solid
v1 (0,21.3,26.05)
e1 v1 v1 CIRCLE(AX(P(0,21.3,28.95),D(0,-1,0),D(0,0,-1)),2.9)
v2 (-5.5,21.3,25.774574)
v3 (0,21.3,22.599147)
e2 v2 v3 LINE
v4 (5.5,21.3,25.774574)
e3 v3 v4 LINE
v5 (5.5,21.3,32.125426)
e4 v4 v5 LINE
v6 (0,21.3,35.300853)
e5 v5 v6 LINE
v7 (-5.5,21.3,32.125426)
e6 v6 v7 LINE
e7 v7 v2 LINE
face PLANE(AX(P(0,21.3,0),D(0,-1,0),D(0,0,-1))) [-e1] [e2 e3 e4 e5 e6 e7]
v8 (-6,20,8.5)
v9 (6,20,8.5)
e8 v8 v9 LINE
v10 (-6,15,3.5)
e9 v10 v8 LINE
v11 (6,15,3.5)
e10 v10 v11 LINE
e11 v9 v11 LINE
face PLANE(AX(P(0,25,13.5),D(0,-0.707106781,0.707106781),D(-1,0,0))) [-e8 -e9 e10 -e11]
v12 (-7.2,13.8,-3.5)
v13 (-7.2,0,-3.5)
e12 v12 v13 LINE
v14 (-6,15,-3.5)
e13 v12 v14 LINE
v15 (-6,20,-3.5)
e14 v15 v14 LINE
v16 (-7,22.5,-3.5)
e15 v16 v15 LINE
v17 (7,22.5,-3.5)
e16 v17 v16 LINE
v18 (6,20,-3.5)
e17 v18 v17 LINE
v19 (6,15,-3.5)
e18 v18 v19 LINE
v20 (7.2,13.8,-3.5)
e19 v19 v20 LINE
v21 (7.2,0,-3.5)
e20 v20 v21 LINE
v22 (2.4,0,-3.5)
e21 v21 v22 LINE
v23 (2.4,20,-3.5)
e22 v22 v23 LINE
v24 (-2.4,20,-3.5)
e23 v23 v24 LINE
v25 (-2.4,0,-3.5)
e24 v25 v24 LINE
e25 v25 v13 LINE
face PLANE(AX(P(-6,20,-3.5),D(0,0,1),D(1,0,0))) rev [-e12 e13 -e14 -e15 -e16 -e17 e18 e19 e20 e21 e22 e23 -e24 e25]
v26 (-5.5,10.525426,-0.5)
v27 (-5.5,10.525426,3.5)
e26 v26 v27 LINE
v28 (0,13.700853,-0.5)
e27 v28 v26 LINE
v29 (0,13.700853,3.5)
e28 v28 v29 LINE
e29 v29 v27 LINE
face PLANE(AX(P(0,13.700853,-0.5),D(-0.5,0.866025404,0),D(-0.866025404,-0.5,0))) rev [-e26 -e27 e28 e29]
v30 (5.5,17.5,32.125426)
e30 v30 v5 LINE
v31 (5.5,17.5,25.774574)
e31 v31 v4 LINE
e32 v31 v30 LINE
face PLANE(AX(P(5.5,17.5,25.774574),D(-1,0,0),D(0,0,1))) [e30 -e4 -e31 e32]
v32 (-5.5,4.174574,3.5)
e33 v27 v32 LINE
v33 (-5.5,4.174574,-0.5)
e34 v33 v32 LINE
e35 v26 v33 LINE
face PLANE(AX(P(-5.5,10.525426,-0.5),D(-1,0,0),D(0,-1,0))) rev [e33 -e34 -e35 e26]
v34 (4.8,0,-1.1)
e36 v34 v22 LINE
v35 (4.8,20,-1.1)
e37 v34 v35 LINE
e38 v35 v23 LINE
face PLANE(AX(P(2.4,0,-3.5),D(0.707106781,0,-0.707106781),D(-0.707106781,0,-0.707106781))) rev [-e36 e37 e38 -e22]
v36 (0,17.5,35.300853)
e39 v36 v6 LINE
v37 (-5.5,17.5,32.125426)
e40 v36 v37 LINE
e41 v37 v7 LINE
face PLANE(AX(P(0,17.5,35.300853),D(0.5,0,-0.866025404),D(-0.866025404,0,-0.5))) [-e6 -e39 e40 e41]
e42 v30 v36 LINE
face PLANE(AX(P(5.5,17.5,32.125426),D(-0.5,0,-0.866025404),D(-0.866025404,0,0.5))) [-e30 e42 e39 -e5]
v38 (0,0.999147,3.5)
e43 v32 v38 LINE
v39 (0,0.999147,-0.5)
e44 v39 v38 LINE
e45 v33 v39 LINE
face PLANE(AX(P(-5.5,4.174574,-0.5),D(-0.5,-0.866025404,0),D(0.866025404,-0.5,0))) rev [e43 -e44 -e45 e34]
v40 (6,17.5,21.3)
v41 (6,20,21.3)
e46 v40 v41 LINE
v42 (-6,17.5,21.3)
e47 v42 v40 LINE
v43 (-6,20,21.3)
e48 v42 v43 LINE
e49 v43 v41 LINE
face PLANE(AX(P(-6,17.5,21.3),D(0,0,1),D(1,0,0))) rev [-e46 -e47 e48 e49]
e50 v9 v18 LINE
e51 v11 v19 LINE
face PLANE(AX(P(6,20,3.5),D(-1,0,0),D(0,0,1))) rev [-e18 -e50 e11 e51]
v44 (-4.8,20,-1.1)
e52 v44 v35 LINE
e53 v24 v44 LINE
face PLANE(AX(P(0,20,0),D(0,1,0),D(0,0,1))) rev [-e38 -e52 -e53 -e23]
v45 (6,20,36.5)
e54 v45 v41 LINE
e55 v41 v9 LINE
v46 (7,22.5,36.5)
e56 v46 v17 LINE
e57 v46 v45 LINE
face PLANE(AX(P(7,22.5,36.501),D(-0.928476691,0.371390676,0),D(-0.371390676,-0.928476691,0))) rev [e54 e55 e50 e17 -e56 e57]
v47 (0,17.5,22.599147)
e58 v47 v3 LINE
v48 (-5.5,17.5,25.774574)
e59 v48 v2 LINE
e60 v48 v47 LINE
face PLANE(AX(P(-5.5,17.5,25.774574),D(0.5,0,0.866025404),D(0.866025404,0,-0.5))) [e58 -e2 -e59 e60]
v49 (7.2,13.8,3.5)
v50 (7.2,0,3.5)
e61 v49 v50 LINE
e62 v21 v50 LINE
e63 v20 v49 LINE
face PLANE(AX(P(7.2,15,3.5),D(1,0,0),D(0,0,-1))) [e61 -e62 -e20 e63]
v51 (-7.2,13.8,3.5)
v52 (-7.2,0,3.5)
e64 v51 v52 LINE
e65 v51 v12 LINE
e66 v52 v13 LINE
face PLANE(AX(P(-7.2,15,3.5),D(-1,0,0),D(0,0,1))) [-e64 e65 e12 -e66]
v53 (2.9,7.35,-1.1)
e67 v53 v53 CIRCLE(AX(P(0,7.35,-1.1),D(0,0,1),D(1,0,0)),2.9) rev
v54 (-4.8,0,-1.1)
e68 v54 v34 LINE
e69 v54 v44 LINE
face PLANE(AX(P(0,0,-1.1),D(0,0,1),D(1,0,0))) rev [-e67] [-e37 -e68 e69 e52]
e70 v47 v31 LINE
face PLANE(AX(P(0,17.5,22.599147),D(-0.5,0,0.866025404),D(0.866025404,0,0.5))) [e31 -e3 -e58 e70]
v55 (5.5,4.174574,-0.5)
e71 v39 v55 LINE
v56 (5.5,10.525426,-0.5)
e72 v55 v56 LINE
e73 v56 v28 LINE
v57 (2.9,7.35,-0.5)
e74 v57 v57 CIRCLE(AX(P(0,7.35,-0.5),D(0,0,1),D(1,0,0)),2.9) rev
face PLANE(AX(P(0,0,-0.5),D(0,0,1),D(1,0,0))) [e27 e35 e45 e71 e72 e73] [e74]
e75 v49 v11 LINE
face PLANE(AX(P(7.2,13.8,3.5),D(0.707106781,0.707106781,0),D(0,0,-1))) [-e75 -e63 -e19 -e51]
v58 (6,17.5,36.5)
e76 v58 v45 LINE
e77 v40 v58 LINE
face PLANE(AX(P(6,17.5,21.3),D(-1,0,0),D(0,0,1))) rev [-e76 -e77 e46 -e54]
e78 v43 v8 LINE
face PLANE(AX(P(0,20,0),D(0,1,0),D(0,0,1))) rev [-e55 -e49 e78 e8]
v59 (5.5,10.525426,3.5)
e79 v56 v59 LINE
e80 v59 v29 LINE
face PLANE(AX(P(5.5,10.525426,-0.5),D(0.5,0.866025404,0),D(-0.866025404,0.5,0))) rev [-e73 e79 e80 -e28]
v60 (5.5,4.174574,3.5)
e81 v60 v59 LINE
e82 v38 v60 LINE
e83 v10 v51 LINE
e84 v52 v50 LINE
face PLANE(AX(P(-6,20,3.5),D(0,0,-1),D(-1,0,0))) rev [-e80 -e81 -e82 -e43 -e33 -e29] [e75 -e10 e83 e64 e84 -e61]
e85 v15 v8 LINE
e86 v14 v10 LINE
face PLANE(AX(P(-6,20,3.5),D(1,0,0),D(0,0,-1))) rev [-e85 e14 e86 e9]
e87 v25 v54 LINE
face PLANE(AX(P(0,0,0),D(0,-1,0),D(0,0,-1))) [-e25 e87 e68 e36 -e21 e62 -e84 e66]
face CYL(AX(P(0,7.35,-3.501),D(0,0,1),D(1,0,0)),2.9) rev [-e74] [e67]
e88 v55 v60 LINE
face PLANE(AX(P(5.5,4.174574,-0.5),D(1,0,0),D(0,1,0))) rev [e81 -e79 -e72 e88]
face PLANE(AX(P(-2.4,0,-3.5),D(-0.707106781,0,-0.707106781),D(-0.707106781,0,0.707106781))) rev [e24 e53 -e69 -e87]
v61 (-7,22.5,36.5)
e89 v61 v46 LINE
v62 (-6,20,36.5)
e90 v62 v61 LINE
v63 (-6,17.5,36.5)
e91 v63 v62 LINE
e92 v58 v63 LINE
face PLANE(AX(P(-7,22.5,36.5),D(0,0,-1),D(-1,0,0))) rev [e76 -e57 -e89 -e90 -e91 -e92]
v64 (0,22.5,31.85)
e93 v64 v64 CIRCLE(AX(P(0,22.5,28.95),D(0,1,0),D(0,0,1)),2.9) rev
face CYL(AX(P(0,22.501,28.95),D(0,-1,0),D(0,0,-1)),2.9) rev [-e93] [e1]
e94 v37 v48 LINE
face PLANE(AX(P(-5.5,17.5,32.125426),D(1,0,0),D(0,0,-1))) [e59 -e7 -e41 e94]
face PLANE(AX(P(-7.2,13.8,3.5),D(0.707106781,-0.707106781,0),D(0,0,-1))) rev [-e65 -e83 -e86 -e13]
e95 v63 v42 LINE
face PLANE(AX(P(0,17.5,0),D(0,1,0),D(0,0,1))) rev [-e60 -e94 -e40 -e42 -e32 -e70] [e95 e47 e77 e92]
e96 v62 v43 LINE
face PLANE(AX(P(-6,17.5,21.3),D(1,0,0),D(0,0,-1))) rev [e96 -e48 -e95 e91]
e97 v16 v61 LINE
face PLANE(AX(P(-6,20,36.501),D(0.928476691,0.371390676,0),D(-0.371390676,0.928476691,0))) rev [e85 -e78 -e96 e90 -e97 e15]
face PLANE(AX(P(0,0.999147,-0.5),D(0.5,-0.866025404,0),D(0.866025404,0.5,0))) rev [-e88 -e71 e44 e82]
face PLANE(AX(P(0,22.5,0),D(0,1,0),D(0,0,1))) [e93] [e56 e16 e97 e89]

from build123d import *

# Parameters (mm, degrees)
SKETCH1_W               = 12
SKETCH1_H               = 7
BOSS_EXTRUDE1_DEPTH     = 20
CUT_EXTRUDE1_DEPTH      = 20
CUT_EXTRUDE2_REACH      = 24.023
SKETCH3_R               = 2.9
CUT_EXTRUDE3_DEPTH      = 4
SKETCH5_W               = 14
SKETCH5_H               = 40
BOSS_EXTRUDE2_DEPTH     = 2.5
CUT_EXTRUDE4_REACH      = 48.425
SKETCH14_W              = 12
SKETCH14_H              = 15.2
BOSS_EXTRUDE6_DEPTH     = 2.5
CUT_EXTRUDE6_DEPTH      = 2.5
CUT_EXTRUDE6_DEPTH_BACK = 1.3
CUT_EXTRUDE7_REACH      = 44.836
SKETCH9_R               = 2.9
SKETCH10_W              = 1.2
SKETCH10_H              = 7
BOSS_EXTRUDE3_DEPTH     = 15
CHAMFER1_SIZE           = 1.2
SKETCH12_W              = 12
SKETCH12_H              = 5
BOSS_EXTRUDE5_DEPTH     = 10
CHAMFER3_SIZE           = 10


# Some blends are built 0.0001 mm under size
with BuildPart() as part:
    # Sketch1 → Boss-Extrude1 (new body)
    with BuildSketch(Plane(origin=(0, 0, 0), x_dir=(1, 0, 0), z_dir=(0, 1, 0))):
        Rectangle(SKETCH1_W, SKETCH1_H)
    extrude(amount=BOSS_EXTRUDE1_DEPTH)

    # Sketch2 → Cut-Extrude1 (cut)
    with BuildSketch(Plane(origin=(0, 20, 0), x_dir=(1, 0, 0), z_dir=(0, 1, 0))):
        Polygon((0, 3.5), (2.4, 3.5), (4.8, 1.1), (0, 1.1), (-4.8, 1.1), (-2.4, 3.5), align=None)
    extrude(amount=-CUT_EXTRUDE1_DEPTH, mode=Mode.SUBTRACT)

    # Sketch3 → Cut-Extrude2 (cut, up to next)
    with BuildSketch(Plane.XY.offset(3.5), mode=Mode.PRIVATE) as cut_extrude2_sk1:
        with Locations((0, 7.35)):
            Circle(SKETCH3_R)
    cut_extrude2_tool1 = extrude(cut_extrude2_sk1.sketch, amount=-CUT_EXTRUDE2_REACH, mode=Mode.PRIVATE) & part.part
    add(cut_extrude2_tool1.solids().sort_by_distance((0, 7.35, 3.5))[0], mode=Mode.SUBTRACT)

    # Sketch4 → Cut-Extrude3 (cut)
    with BuildSketch(Plane.XY.offset(3.5)):
        Polygon((0, 13.700852961), (-5.5, 10.525426481), (-5.5, 4.174573519), (0, 0.999147039), (5.5, 4.174573519), (5.5, 10.525426481), align=None)
    extrude(amount=-CUT_EXTRUDE3_DEPTH, mode=Mode.SUBTRACT)

    # Sketch5 → Boss-Extrude2 (add)
    with BuildSketch(Plane(origin=(0, 20, 0), x_dir=(1, 0, 0), z_dir=(0, 1, 0))):
        with Locations((0, -16.5)):
            Rectangle(SKETCH5_W, SKETCH5_H)
    extrude(amount=BOSS_EXTRUDE2_DEPTH)

    # Sketch6 → Cut-Extrude4 (cut, up to next)
    with BuildSketch(Plane(origin=(0, 0, -3.5), x_dir=(-1, 0, 0), z_dir=(0, 0, -1)), mode=Mode.PRIVATE) as cut_extrude4_sk1:
        Polygon((-7, 20), (-7, 22.5), (-6, 20), align=None)
    cut_extrude4_tool1 = extrude(cut_extrude4_sk1.sketch, amount=-CUT_EXTRUDE4_REACH, mode=Mode.PRIVATE) & part.part
    # Sketch6 → Cut-Extrude4 (cut, up to next)
    with BuildSketch(Plane(origin=(0, 0, -3.5), x_dir=(-1, 0, 0), z_dir=(0, 0, -1)), mode=Mode.PRIVATE) as cut_extrude4_sk2:
        Polygon((7, 20), (6, 20), (7, 22.5), align=None)
    cut_extrude4_tool2 = extrude(cut_extrude4_sk2.sketch, amount=-CUT_EXTRUDE4_REACH, mode=Mode.PRIVATE) & part.part
    add(cut_extrude4_tool1.solids().sort_by_distance((6.666667, 20.833333, -3.5))[0], mode=Mode.SUBTRACT)
    add(cut_extrude4_tool2.solids().sort_by_distance((-6.666667, 20.833333, -3.5))[0], mode=Mode.SUBTRACT)

    # Sketch14 → Boss-Extrude6 (add)
    with BuildSketch(Plane.XZ.offset(-20)):
        with Locations((0, 28.9)):
            Rectangle(SKETCH14_W, SKETCH14_H)
    extrude(amount=BOSS_EXTRUDE6_DEPTH)

    # Sketch8 → Cut-Extrude6 (cut, two sides: drawn at the far end of the back side and taken through both)
    with BuildSketch(Plane.XZ.offset(-20).offset(-CUT_EXTRUDE6_DEPTH_BACK)):
        Polygon((0, 22.599147039), (5.5, 25.774573519), (5.5, 32.125426481), (0, 35.300852961), (-5.5, 32.125426481), (-5.5, 25.774573519), align=None)
    extrude(amount=CUT_EXTRUDE6_DEPTH + CUT_EXTRUDE6_DEPTH_BACK, mode=Mode.SUBTRACT)

    # Sketch9 → Cut-Extrude7 (cut, up to next)
    with BuildSketch(Plane(origin=(0, 21.3, 0), x_dir=(-1, 0, 0), z_dir=(0, -1, 0)), mode=Mode.PRIVATE) as cut_extrude7_sk1:
        with Locations(Location((0, -28.95, 0), (0, 0, 90))):
            Circle(SKETCH9_R)
    cut_extrude7_tool1 = extrude(cut_extrude7_sk1.sketch, amount=-CUT_EXTRUDE7_REACH, mode=Mode.PRIVATE) & part.part
    add(cut_extrude7_tool1.solids().sort_by_distance((0, 21.3, 28.95))[0], mode=Mode.SUBTRACT)

    # Sketch10 → Boss-Extrude3 (add)
    with BuildSketch(Plane.XZ):
        with Locations((-6.6, 0)):
            Rectangle(SKETCH10_W, SKETCH10_H)
        with Locations((6.6, 0)):
            Rectangle(SKETCH10_W, SKETCH10_H)
    extrude(amount=-BOSS_EXTRUDE3_DEPTH)

    # Chamfer1
    chamfer1_edges = [part.edges().sort_by_distance(p)[0] for p in [
        (7.2, 15, 0),
        (-7.2, 15, 0),
    ]]
    chamfer(chamfer1_edges, length=CHAMFER1_SIZE - 0.0001)  # a hair under: the kernel refuses the full size

    # Sketch12 → Boss-Extrude5 (add)
    with BuildSketch(Plane.XY.offset(3.5)):
        with Locations((0, 17.5)):
            Rectangle(SKETCH12_W, SKETCH12_H)
    extrude(amount=BOSS_EXTRUDE5_DEPTH)

    # Chamfer3
    # the kernel refuses this chamfer: 10 mm, written as the material it takes off along each edge
    with BuildSketch(Plane(origin=(31.71682988, 15, 13.5), x_dir=(0, -0.027495876610586317, -0.9996219169112968), z_dir=(-1, 0, 0))) as chamfer3_piece_1_section:
        Polygon((CHAMFER3_SIZE * 0.999621916911, -CHAMFER3_SIZE * 0.0274958766106), (-CHAMFER3_SIZE * 0.0274958766106, -CHAMFER3_SIZE * 0.999621916911), (0, 0), align=None)
    chamfer3_piece_1 = extrude(amount=63.433659759, mode=Mode.PRIVATE)
    chamfer3_piece_1 = split(chamfer3_piece_1, bisect_by=Plane(origin=(4.860757505, 20, 8.732154153), z_dir=(0, -1, 0)), keep=Keep.TOP, mode=Mode.PRIVATE)
    add(chamfer3_piece_1, mode=Mode.SUBTRACT)


solid = part.part
